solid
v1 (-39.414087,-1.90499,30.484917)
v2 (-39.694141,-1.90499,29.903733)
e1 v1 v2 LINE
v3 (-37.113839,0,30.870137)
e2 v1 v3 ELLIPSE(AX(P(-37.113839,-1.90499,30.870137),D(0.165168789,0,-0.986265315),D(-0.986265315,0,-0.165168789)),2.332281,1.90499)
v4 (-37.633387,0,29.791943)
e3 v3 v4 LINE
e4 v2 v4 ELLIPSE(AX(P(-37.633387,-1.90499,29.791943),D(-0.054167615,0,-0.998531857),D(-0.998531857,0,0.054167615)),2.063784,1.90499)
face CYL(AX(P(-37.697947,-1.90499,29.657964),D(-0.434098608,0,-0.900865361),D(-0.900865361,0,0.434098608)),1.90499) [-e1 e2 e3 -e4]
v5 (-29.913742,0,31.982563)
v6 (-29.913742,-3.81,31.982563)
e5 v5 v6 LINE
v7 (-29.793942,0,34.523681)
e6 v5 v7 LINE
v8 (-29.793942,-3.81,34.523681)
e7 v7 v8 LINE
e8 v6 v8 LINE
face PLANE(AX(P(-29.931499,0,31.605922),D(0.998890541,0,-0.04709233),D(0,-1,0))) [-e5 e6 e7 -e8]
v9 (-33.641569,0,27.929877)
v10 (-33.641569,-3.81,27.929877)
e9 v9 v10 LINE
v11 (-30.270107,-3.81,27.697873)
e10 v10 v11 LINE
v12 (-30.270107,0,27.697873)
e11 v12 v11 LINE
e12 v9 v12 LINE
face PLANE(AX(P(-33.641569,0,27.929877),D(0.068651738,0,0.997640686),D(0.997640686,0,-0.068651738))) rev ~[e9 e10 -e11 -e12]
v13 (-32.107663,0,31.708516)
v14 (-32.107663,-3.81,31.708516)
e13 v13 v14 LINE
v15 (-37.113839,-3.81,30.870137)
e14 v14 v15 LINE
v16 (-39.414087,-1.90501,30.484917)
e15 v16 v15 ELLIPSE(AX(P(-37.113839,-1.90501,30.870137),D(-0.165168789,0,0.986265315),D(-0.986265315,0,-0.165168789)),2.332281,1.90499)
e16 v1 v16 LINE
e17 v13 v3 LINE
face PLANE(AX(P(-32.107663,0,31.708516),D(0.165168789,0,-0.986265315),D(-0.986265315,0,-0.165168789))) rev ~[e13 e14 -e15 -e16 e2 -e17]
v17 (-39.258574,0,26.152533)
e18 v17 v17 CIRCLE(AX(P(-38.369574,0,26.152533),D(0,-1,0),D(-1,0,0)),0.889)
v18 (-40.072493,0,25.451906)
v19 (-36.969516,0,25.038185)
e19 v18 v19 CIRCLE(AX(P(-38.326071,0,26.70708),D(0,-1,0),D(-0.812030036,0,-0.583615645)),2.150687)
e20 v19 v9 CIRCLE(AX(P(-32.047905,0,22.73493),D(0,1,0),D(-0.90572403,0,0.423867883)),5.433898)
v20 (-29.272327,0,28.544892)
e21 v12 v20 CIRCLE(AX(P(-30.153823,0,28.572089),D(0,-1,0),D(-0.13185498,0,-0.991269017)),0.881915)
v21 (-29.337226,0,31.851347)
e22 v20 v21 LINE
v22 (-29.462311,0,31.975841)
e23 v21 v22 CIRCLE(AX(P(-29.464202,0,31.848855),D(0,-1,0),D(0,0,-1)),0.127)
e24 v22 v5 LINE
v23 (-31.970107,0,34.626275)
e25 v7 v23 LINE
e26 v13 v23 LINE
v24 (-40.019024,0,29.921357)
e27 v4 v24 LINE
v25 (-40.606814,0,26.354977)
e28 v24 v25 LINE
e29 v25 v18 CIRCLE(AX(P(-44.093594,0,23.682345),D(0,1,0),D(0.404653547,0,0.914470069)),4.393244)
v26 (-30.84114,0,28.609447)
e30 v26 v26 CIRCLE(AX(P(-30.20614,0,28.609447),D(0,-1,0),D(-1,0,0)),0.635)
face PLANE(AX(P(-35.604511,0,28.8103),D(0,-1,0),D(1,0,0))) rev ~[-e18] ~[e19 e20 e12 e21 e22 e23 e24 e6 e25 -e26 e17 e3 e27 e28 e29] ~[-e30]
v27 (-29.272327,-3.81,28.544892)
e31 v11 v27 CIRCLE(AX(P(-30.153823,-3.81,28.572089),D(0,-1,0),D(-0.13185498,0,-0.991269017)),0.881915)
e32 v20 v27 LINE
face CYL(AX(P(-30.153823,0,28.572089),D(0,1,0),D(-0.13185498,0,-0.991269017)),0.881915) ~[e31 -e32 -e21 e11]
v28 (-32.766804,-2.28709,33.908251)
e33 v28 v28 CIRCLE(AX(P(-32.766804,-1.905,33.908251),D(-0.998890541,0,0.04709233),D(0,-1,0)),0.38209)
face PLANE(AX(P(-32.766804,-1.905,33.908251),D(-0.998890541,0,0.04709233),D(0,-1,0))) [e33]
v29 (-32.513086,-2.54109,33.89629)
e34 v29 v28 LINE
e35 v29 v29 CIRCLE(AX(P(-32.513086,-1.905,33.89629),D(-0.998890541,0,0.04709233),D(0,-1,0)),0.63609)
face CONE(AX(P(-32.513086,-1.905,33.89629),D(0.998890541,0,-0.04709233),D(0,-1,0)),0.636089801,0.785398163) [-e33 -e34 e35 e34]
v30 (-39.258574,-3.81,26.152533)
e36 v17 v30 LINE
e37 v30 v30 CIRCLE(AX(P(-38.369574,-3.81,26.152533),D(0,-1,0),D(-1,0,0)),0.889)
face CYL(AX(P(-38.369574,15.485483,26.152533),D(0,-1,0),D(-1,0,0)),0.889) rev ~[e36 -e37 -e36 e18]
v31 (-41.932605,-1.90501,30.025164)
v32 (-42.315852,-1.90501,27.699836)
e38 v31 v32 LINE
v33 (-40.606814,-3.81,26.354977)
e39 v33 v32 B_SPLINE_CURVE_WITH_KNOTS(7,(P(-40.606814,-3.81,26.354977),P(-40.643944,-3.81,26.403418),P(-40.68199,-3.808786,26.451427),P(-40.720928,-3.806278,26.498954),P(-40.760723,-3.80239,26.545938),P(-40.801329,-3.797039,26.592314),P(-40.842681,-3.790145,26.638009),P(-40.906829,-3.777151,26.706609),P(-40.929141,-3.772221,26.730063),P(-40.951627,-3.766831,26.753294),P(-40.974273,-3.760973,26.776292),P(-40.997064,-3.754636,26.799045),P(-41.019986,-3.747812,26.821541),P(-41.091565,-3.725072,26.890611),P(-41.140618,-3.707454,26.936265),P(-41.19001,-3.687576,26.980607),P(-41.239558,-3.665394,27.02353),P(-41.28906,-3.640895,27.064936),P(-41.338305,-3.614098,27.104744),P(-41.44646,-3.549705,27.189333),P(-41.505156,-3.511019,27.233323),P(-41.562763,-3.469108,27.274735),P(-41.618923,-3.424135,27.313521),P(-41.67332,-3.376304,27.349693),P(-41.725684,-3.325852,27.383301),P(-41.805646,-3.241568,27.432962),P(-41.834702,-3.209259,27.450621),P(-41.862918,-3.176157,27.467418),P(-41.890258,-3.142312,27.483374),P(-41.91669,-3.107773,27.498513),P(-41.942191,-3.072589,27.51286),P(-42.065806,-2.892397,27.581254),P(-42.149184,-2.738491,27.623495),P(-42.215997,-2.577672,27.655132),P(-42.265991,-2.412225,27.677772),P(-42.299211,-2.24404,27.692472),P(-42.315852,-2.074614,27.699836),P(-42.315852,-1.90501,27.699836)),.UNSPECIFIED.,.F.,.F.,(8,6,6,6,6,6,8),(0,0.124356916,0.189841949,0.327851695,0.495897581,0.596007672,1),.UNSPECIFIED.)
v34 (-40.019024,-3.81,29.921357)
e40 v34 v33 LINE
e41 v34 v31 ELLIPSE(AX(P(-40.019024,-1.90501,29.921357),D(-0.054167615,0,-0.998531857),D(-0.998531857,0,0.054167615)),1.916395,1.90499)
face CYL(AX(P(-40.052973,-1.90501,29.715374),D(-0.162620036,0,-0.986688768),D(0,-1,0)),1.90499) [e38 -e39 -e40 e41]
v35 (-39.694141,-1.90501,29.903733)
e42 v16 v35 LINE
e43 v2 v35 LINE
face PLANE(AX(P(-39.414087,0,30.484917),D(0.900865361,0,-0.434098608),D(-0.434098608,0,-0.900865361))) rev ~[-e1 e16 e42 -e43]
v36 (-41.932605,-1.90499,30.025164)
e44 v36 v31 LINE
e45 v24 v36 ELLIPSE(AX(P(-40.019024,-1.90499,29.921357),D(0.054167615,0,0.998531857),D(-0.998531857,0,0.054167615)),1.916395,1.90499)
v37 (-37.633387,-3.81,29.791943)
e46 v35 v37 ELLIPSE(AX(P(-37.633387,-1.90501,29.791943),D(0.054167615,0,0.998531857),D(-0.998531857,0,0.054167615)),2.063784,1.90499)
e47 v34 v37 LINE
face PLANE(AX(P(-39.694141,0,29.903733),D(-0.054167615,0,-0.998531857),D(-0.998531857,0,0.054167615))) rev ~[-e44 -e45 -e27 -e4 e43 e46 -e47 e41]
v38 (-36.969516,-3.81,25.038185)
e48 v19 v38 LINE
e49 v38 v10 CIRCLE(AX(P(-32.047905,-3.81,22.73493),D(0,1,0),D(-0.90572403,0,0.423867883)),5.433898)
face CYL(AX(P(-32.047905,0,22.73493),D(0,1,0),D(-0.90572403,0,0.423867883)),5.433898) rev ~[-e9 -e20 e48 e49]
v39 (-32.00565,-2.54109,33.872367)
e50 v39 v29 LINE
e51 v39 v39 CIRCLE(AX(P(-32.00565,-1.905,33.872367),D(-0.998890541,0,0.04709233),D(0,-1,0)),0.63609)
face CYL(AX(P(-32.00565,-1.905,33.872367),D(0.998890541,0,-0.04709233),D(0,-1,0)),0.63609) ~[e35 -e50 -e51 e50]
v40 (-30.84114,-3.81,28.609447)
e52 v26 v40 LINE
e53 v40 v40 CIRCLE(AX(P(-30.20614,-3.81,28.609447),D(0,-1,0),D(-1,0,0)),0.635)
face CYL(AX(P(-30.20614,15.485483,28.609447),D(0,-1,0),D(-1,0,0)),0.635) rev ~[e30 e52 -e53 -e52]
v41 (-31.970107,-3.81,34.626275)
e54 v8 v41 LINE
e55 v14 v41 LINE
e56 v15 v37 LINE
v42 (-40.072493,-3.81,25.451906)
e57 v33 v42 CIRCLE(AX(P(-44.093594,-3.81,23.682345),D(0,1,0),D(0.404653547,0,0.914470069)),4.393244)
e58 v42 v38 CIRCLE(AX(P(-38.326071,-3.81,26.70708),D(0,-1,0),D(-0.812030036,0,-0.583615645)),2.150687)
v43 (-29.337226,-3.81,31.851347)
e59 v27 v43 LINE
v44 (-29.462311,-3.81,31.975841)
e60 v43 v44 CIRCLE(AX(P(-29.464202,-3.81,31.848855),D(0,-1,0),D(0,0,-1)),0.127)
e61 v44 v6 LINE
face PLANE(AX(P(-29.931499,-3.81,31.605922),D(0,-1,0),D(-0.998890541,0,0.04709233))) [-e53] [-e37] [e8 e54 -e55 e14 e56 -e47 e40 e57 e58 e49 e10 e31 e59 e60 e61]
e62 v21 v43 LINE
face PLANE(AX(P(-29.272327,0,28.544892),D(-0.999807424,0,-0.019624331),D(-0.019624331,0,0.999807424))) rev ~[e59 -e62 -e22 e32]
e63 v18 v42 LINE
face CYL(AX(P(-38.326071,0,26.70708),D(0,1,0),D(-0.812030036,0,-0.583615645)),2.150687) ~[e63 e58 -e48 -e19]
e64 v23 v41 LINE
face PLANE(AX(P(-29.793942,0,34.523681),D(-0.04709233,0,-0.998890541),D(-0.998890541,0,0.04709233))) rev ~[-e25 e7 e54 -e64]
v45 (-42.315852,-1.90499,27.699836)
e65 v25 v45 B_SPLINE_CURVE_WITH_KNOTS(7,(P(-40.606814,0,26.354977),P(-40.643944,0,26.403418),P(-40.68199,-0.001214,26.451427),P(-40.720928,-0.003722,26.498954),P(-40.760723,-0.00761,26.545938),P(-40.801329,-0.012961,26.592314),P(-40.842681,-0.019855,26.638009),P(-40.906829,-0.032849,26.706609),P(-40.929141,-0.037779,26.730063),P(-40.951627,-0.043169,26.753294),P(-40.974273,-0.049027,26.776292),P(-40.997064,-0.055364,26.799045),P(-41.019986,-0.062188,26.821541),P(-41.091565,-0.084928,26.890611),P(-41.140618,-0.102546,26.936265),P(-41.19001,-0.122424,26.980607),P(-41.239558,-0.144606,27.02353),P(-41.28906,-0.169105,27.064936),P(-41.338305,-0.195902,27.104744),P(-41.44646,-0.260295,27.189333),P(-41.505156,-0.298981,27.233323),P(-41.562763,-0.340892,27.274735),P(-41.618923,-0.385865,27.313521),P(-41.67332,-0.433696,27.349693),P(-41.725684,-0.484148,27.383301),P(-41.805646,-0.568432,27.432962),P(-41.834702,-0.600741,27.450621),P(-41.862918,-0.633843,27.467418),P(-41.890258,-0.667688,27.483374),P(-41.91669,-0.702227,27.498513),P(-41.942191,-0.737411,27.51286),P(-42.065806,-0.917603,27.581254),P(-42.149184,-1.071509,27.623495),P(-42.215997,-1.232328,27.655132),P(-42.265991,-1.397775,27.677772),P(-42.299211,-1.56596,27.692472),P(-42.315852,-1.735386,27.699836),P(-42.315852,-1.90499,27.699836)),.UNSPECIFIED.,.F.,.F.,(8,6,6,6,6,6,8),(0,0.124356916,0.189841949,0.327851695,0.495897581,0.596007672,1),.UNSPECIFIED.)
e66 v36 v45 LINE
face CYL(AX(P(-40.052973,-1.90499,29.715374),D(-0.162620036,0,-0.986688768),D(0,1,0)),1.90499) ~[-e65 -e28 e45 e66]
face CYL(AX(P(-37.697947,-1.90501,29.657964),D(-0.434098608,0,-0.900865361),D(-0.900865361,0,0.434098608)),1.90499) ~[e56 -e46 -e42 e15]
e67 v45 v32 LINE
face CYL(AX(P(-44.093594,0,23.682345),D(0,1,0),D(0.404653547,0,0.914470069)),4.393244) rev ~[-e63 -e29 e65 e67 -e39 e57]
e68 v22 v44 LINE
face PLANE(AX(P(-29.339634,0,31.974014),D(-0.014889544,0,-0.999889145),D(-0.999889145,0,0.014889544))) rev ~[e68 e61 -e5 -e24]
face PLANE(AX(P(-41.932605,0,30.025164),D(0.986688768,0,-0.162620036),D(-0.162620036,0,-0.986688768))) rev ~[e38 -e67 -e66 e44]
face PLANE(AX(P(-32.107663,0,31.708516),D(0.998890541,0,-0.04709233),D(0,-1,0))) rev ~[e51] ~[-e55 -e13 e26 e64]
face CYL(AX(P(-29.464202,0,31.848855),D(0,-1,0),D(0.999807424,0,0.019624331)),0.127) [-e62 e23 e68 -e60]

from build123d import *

# Parameters (mm, degrees)
F1_DEPTH = 3.81
F2_D     = 1.778
F3_D     = 1.27
F4_R     = 1.90499
F5_DEPTH = 2.921
F6_R     = 0.636089801
F7_DEPTH = 0.762
F8_SIZE  = 0.254
F9_R     = 0.127


# Not quite as in the source:
# - a fillet or chamfer is up to 0.001 mm smaller than in the source, because OpenCascade refuses the exact size
# - a feature names something its author has since deleted; it is built from what else it names


with BuildPart() as f1:
    # F0 (on Front) → F1 (new body)
    with BuildSketch(Plane.XZ):
        with BuildLine():
            Line((-39.4140869416, 30.484917322), (-39.6941413215, 29.9037330352))
            Line((-39.6941413215, 29.9037330352), (-41.9326054958, 30.025163579))
            Line((-41.9326054958, 30.025163579), (-42.315851897, 27.6998355985))
            ThreePointArc((-42.315851897, 27.6998355985), (-40.9839410359, 26.7856748681), (-40.0724932551, 25.4519060254))
            ThreePointArc((-40.0724932551, 25.4519060254), (-38.6103077884, 24.5752589314), (-36.9695164263, 25.0381845981))
            ThreePointArc((-36.9695164263, 25.0381845981), (-35.6119860231, 26.8367061404), (-33.6415685093, 27.929877378))
            Line((-33.6415685093, 27.929877378), (-30.2701074994, 27.6978733483))
            ThreePointArc((-30.2701074994, 27.6978733483), (-29.5830798604, 27.8997588647), (-29.2723267028, 28.5448923498))
            Line((-29.2723267028, 28.5448923498), (-29.339633882, 31.9740138948))
            Line((-29.339633882, 31.9740138948), (-29.925275594, 31.9827347994))
            Line((-29.925275594, 31.9827347994), (-29.9314986914, 31.6059216857))
            Line((-29.9314986914, 31.6059216857), (-32.1076634707, 31.7085161805))
            Line((-32.1076634707, 31.7085161805), (-39.4140869416, 30.484917322))
        make_face()
    extrude(amount=F1_DEPTH)

    # F2 (through all)
    with Locations(Plane(origin=(0, 0, 0), x_dir=(1, 0, 0), z_dir=(0, 1, 0))):
        with Locations((-38.3695736527, -26.1525325477)):
            Hole(F2_D / 2)

    # F3 (through all)
    with Locations(Plane(origin=(0, 0, 0), x_dir=(1, 0, 0), z_dir=(0, 1, 0))):
        with Locations((-30.2061401308, -28.6094471812)):
            Hole(F3_D / 2)

    # F4 (radius 1.905 in the source; OpenCascade refuses exactly that, so slightly less here)
    f4_edges = [f1.edges().sort_by_distance(p)[0] for p in [
        (-42.124229, -3.81, 28.8625),
        (-42.124229, 0, 28.8625),
        (-39.554114, -3.81, 30.194325),
        (-39.554114, 0, 30.194325),
    ]]
    fillet(f4_edges, radius=F4_R)

    # F5 (add): a face of the model
    f5_faces = [f1.faces().sort_by_distance(p)[0] for p in [
        (-31.0195810811, -1.905, 31.6572189331),
    ]]
    extrude(f5_faces, amount=F5_DEPTH)

    # F6 (on face) → F7 (join)
    with BuildSketch(Plane(origin=(-33.5280299441, 0, 1.5806667432), x_dir=(0, -1, 0), z_dir=(-0.9988905408, 0, 0.0470923302))):
        with Locations((1.905, 32.3275662959)):
            Circle(F6_R)
    extrude(amount=F7_DEPTH)

    # F8
    f8_edges = [f1.edges().sort_by_distance(p)[0] for p in [
        (-32.766804, -1.26891, 33.908251),
    ]]
    chamfer(f8_edges, length=F8_SIZE)

    # F9
    f9_edges = [f1.edges().sort_by_distance(p)[0] for p in [
        (-29.339634, -1.905, 31.974014),
    ]]
    fillet(f9_edges, radius=F9_R)


solid = f1.part
